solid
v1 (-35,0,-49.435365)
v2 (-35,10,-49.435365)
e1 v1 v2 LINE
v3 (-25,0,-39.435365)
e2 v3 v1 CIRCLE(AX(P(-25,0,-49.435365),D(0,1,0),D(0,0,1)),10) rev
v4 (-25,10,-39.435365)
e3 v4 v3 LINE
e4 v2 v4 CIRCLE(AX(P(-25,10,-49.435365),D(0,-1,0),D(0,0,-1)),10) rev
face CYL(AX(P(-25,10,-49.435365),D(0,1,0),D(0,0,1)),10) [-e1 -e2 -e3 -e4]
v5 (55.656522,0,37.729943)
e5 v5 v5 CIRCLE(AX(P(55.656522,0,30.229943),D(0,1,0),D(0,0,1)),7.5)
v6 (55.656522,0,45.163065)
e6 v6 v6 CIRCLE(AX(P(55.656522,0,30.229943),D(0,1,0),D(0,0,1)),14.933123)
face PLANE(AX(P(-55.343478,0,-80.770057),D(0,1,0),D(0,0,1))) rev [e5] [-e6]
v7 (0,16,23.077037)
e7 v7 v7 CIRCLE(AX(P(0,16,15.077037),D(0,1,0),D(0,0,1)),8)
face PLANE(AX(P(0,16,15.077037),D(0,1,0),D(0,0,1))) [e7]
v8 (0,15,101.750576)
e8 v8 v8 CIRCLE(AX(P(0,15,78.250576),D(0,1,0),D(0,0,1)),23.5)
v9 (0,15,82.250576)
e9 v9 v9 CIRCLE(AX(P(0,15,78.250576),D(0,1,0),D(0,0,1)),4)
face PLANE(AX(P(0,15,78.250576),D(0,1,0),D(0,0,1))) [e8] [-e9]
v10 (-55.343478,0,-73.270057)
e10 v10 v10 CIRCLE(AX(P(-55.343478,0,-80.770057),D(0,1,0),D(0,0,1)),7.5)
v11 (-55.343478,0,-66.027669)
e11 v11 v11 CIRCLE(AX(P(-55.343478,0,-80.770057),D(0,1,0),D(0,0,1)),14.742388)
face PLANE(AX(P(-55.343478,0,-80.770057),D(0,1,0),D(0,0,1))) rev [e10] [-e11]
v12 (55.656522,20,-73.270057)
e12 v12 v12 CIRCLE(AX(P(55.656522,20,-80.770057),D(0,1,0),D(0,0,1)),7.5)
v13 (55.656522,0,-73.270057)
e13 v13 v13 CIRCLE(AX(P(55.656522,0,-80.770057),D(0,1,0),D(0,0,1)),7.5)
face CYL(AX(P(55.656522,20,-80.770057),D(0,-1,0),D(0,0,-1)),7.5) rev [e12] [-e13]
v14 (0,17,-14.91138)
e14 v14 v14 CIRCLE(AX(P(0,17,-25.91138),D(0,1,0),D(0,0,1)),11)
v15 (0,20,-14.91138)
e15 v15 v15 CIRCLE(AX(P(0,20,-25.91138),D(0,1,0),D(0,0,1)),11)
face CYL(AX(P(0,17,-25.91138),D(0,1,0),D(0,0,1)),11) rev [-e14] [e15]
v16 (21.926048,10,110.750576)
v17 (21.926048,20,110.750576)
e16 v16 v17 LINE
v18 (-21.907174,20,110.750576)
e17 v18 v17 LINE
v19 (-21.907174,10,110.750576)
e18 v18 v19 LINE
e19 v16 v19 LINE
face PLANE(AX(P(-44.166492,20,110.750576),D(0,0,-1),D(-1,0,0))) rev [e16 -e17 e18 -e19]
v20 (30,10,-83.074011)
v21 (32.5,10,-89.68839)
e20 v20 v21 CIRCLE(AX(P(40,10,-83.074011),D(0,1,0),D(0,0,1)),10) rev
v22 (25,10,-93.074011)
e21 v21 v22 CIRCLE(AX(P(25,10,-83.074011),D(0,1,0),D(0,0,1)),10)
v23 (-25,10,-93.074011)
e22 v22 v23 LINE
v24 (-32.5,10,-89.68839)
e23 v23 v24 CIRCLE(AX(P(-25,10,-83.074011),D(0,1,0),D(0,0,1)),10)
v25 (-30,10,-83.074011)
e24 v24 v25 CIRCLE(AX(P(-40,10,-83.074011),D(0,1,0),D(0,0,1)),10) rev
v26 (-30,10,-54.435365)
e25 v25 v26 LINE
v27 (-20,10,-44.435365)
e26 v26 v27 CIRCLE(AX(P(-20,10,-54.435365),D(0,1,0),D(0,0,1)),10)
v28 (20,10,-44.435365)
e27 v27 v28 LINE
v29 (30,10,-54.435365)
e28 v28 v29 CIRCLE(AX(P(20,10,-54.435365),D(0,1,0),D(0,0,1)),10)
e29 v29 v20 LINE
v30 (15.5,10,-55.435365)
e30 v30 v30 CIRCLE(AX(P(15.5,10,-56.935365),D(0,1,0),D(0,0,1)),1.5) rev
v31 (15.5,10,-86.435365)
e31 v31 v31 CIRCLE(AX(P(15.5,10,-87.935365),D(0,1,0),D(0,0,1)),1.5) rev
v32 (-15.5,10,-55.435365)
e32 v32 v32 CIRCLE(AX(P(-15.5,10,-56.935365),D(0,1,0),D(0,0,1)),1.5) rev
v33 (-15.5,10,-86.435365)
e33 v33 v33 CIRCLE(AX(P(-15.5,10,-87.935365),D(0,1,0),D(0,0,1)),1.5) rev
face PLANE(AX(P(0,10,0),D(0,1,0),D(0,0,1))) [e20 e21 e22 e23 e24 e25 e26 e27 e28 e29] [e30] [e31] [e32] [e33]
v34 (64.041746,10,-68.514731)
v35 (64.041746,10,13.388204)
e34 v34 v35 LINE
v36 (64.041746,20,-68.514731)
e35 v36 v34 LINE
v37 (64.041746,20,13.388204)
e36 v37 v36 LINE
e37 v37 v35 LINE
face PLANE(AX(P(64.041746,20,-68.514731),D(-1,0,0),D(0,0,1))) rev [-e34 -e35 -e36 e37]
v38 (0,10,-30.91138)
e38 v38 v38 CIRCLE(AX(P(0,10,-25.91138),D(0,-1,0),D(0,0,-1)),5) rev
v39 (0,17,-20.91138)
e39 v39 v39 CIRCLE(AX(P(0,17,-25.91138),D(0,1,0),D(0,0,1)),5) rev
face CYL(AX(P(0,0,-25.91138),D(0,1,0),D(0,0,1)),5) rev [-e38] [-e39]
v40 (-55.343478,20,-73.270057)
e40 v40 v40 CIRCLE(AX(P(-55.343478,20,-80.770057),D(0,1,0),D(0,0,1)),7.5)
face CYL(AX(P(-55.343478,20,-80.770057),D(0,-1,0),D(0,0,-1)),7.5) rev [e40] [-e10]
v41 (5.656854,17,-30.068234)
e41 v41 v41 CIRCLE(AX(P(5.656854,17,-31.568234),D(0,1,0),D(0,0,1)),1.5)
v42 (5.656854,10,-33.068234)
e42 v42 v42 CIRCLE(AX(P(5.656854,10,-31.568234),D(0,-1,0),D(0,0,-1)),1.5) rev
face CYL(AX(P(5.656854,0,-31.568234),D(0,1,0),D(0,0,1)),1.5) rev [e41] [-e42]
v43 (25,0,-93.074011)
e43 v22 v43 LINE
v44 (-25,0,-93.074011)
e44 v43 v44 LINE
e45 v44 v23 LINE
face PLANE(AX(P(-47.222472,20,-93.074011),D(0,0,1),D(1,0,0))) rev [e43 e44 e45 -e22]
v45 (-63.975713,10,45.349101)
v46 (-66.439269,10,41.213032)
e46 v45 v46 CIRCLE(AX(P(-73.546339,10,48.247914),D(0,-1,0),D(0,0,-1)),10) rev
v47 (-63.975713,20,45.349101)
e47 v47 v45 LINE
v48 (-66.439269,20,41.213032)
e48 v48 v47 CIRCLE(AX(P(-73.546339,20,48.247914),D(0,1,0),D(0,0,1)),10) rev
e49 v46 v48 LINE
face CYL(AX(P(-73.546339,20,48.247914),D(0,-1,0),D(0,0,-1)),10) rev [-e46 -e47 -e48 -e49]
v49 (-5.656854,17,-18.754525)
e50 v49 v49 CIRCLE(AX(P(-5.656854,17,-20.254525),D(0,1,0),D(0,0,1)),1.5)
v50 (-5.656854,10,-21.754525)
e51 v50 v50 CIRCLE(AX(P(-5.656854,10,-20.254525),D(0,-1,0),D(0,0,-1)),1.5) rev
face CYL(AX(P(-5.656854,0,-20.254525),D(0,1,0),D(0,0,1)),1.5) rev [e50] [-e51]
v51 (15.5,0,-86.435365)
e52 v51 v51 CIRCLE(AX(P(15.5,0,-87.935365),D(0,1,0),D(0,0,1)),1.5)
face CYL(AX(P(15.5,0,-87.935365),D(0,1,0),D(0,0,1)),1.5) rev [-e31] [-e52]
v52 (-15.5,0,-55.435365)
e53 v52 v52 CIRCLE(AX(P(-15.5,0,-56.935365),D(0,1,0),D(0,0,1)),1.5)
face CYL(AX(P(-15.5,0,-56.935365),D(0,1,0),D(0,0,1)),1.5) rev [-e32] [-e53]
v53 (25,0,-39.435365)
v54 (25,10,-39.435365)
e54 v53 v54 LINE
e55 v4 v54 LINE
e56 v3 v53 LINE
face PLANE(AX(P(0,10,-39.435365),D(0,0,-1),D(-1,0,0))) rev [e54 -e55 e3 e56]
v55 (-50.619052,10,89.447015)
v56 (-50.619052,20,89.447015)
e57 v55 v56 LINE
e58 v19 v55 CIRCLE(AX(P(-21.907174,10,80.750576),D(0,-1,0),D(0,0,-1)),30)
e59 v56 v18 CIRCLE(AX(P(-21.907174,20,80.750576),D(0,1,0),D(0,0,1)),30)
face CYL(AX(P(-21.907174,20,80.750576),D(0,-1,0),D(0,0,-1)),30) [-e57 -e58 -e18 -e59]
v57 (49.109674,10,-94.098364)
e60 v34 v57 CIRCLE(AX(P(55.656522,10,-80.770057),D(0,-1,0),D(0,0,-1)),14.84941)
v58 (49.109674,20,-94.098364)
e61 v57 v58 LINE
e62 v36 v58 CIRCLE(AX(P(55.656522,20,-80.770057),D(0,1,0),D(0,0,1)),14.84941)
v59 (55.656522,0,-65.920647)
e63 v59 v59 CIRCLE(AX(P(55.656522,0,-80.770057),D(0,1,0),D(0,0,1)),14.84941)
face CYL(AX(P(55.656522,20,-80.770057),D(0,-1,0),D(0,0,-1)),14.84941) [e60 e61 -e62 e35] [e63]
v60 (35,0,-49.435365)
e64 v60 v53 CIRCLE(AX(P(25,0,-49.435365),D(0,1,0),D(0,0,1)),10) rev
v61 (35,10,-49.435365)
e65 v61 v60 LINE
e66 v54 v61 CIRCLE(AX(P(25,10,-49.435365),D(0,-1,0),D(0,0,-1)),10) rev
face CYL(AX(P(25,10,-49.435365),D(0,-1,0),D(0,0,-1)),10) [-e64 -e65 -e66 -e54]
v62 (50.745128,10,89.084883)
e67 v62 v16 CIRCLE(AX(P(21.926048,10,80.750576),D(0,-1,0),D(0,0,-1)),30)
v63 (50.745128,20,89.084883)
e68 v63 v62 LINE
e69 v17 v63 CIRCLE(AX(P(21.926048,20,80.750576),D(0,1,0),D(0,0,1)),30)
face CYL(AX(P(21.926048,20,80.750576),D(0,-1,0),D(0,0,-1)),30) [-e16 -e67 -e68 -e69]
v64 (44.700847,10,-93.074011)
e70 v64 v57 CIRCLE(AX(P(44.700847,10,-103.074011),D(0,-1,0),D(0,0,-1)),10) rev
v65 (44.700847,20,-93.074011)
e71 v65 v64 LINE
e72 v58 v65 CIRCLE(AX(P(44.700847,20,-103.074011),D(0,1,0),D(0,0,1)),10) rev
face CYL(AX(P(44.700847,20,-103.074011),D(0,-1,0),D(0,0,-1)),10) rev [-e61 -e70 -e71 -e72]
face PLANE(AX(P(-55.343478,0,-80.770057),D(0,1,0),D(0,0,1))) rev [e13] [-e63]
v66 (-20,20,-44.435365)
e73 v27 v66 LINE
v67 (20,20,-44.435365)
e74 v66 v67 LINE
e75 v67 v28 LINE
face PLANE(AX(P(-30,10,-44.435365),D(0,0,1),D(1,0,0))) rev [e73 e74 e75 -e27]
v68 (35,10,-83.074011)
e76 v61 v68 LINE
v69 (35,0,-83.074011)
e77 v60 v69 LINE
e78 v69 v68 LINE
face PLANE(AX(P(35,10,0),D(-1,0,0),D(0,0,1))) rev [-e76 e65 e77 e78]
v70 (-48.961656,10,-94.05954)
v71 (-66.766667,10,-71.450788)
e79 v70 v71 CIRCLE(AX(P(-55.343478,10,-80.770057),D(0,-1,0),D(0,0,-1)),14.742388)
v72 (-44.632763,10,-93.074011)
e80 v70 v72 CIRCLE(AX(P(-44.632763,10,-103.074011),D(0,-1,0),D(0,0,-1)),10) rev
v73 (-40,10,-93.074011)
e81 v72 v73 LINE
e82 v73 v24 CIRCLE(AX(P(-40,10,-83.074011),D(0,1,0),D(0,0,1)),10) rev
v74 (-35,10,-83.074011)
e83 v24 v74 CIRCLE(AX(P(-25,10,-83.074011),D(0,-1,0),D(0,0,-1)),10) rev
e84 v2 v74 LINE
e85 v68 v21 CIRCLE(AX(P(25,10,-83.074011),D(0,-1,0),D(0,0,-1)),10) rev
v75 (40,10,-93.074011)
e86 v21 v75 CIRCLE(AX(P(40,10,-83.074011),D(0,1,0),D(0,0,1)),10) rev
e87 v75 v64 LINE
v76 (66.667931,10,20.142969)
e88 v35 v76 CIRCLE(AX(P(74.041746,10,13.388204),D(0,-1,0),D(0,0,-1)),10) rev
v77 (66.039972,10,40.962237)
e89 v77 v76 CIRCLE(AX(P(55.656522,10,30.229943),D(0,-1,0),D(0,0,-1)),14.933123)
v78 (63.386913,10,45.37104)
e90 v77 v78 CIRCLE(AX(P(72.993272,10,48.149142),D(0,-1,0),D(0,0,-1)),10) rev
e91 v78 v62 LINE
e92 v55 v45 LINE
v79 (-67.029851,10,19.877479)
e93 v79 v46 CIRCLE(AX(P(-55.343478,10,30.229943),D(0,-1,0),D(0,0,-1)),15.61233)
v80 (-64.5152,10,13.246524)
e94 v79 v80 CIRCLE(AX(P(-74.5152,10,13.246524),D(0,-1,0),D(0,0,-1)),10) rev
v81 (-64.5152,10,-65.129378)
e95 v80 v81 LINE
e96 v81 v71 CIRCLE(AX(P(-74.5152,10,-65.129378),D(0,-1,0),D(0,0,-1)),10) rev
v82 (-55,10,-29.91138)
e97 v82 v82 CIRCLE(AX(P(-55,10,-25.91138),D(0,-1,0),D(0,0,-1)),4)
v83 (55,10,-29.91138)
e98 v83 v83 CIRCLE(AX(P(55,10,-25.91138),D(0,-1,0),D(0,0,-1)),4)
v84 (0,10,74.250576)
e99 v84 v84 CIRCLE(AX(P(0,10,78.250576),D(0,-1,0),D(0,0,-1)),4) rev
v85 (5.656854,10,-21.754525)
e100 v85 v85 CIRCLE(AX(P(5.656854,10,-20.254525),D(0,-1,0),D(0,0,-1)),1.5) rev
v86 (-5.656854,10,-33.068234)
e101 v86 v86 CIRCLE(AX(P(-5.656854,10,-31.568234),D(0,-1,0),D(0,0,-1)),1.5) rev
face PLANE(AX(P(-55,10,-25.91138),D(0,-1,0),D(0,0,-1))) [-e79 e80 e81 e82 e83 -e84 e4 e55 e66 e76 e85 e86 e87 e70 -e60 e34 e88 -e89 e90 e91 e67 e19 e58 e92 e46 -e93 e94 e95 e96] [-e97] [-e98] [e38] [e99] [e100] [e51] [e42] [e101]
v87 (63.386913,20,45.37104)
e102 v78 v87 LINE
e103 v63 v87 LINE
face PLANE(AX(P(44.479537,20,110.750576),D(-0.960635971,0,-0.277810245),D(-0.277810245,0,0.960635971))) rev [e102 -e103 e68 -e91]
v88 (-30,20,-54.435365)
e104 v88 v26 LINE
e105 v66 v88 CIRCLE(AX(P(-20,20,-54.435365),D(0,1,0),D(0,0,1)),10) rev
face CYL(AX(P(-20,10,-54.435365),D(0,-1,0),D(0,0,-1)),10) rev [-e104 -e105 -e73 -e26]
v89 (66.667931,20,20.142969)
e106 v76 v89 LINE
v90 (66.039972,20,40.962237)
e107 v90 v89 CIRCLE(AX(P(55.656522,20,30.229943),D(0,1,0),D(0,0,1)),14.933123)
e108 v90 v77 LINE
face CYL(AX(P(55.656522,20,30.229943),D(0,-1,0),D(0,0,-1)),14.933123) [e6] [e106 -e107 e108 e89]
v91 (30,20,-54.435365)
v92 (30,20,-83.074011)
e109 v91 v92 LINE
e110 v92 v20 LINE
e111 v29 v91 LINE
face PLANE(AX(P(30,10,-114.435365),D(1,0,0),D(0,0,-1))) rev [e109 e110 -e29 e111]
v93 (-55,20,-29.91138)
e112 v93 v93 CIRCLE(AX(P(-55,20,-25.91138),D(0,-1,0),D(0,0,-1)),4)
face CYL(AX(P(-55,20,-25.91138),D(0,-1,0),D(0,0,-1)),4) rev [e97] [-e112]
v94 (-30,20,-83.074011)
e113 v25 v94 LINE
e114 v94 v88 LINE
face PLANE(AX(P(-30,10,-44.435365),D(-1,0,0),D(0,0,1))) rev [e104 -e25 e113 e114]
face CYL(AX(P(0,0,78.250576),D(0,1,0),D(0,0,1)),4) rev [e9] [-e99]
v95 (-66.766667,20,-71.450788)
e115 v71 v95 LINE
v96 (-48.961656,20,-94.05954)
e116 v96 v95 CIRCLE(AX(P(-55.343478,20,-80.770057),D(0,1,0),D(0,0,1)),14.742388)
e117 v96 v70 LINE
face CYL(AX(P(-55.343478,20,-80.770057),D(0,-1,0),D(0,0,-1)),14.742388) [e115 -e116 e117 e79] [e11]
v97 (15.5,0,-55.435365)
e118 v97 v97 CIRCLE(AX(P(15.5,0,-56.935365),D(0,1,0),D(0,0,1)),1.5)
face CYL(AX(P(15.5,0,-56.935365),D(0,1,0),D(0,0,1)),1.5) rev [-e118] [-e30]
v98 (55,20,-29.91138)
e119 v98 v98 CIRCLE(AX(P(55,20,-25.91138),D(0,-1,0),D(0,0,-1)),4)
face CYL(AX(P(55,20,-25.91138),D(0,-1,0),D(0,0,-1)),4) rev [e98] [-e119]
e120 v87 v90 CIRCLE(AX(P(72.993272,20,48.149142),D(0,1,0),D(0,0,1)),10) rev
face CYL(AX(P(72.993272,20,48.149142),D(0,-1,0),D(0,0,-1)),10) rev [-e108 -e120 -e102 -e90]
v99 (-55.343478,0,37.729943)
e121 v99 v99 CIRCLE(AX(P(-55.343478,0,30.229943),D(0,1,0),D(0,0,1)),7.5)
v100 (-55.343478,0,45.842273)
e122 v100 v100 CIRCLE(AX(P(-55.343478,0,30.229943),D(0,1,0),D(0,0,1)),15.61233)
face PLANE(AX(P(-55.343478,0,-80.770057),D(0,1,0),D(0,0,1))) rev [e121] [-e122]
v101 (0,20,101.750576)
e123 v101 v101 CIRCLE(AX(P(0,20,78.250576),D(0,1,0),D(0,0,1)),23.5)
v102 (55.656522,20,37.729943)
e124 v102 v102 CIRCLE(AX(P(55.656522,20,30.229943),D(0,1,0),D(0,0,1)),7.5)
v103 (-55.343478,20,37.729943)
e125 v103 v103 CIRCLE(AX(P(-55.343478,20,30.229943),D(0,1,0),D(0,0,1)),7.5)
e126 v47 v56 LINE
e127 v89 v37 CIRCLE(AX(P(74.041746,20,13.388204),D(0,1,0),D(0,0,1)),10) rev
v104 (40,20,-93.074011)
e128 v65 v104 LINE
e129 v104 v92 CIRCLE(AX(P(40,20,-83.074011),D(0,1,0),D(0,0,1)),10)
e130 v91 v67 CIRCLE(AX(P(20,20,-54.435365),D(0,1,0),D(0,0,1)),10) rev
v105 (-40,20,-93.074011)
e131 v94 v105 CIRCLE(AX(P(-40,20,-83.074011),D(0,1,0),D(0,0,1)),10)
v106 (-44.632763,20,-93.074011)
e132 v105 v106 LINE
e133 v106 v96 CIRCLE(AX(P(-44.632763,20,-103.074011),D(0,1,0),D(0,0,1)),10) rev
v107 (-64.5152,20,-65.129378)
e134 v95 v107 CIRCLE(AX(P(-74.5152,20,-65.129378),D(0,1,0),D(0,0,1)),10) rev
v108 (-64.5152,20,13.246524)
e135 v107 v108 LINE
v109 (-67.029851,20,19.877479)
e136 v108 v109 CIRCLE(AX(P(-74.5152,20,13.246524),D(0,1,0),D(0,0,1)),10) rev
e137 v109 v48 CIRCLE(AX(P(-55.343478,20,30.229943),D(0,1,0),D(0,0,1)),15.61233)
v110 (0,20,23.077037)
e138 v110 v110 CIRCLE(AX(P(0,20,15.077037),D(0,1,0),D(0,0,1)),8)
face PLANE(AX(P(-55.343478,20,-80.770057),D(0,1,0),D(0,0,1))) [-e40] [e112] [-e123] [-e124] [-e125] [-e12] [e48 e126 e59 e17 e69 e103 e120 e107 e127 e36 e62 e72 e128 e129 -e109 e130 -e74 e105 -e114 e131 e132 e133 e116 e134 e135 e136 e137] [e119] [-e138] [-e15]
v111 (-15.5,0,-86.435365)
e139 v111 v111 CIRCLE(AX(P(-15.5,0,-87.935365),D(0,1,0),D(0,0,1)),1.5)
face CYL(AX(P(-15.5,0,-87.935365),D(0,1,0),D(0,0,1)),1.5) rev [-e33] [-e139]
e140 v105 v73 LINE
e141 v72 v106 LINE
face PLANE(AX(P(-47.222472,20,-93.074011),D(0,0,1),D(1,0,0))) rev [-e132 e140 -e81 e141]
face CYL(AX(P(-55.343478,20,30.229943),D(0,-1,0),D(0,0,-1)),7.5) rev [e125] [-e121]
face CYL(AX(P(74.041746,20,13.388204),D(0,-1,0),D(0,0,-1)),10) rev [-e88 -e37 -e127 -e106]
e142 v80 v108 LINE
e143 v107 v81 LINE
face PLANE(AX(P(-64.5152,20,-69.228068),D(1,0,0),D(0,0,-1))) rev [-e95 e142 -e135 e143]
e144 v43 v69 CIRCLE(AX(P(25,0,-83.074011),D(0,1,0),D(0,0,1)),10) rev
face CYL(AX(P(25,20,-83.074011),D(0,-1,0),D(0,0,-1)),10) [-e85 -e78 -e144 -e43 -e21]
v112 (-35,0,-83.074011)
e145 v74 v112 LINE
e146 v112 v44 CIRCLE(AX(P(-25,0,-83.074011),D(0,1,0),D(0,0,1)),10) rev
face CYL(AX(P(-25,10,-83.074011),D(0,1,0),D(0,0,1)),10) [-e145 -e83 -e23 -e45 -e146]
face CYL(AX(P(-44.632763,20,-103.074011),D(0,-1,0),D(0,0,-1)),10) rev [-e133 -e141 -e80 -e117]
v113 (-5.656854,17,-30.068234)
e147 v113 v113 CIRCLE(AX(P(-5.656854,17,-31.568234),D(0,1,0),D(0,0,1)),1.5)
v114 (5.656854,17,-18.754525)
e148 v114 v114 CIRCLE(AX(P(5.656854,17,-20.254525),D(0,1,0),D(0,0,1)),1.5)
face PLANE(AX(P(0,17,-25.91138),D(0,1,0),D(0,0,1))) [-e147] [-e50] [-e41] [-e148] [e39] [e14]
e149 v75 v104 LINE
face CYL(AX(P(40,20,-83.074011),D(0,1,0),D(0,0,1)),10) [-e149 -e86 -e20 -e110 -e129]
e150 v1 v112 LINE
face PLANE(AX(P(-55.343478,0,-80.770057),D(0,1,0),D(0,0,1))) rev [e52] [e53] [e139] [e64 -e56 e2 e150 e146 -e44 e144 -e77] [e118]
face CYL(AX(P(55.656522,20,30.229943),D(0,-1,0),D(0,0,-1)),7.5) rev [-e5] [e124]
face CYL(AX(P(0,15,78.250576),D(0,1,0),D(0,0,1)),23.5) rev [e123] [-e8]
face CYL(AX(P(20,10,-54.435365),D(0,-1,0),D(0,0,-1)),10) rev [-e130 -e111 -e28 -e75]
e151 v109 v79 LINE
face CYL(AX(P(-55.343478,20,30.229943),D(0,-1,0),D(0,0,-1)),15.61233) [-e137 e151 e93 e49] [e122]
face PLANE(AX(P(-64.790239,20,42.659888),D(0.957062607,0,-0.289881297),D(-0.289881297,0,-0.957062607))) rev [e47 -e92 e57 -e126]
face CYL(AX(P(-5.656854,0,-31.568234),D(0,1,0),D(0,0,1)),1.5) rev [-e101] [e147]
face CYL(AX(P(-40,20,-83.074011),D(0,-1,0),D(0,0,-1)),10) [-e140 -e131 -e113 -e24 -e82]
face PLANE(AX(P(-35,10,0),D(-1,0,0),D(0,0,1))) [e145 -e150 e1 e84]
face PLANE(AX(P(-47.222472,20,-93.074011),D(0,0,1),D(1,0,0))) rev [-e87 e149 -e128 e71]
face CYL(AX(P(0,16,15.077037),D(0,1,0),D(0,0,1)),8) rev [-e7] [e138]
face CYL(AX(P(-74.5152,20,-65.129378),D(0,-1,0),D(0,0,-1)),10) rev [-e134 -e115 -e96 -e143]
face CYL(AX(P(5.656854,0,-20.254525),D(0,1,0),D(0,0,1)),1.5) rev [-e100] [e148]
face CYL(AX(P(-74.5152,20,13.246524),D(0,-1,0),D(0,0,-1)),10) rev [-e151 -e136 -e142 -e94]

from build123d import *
from build123d.topology import SkipClean

# Parameters (mm, degrees)
SKETCH1_R           = 7.5
BOSS_EXTRUDE1_DEPTH = 20
SKETCH2_R           = 1.5
CUT_EXTRUDE1_DEPTH  = 20
SKETCH4_R           = 5
CUT_EXTRUDE2_DEPTH  = 20
SKETCH5_R           = 11
CUT_EXTRUDE3_DEPTH  = 3
SKETCH6_R           = 1.5
CUT_EXTRUDE4_DEPTH  = 133.625098353
SKETCH7_R           = 8
CUT_EXTRUDE5_DEPTH  = 4
FILLET3_R           = 30
FILLET4_R           = 10
SKETCH9_R           = 23.5
CUT_EXTRUDE6_DEPTH  = 5
SKETCH10_R          = 4
CUT_EXTRUDE7_DEPTH  = 133.383596843
SKETCH11_W          = 60
SKETCH11_H          = 70
CUT_EXTRUDE8_DEPTH  = 10
FILLET5_R           = 10
SKETCH12_R          = 12
CUT_EXTRUDE9_DEPTH  = 10
FILLET6_R           = 10
SKETCH13_R          = 4
CUT_EXTRUDE10_DEPTH = 132.910639121
SKETCH14_R          = 1.5
SKETCH14_R_2        = 5
SKETCH14_R_3        = 4
CUT_EXTRUDE11_DEPTH = 10
FILLET8_R           = 10
FILLET9_R           = 10


with BuildPart() as part:
    # Sketch1 → Boss-Extrude1 (new body)
    with BuildSketch(Plane(origin=(0, 0, 0), x_dir=(1, 0, 0), z_dir=(0, 1, 0))):
        with BuildLine():
            Line((-47.222472379, 93.074011467), (47.342817227, 93.074011467))
            ThreePointArc((47.342817227, 93.074011467), (67.936214726, 89.11955675), (64.041745588, 68.514731035))
            Line((64.041745588, 68.514731035), (64.041745588, -17.873317711))
            ThreePointArc((64.041745588, -17.873317711), (70.589208872, -30.115804346), (64.22965137, -42.456946225))
            Line((64.22965137, -42.456946225), (44.479537272, -110.750576059))
            Line((44.479537272, -110.750576059), (-44.166492384, -110.750576059))
            Line((-44.166492384, -110.750576059), (-64.790239223, -42.659888117))
            ThreePointArc((-64.790239223, -42.659888117), (-70.954867588, -30.058632987), (-64.515200042, -17.595689691))
            Line((-64.515200042, -17.595689691), (-64.515200042, 69.228067604))
            ThreePointArc((-64.515200042, 69.228067604), (-67.278018242, 89.424810491), (-47.222472379, 93.074011467))
        make_face()
        with Locations(Location((-55.343477556, 80.770057168, 0), (0, 0, 270))):
            Circle(SKETCH1_R, mode=Mode.SUBTRACT)
        with Locations(Location((55.656522444, 80.770057168, 0), (0, 0, 270))):
            Circle(SKETCH1_R, mode=Mode.SUBTRACT)
        with Locations(Location((-55.343477556, -30.229942832, 0), (0, 0, 270))):
            Circle(SKETCH1_R, mode=Mode.SUBTRACT)
        with Locations(Location((55.656522444, -30.229942832, 0), (0, 0, 270))):
            Circle(SKETCH1_R, mode=Mode.SUBTRACT)
    extrude(amount=BOSS_EXTRUDE1_DEPTH)

    # Sketch2 → Cut-Extrude1 (cut)
    with BuildSketch(Plane(origin=(0, 20, 0), x_dir=(1, 0, 0), z_dir=(0, 1, 0))):
        with Locations(Location((-15.5, 87.935365278, 0), (0, 0, 270))):
            Circle(SKETCH2_R)
        with Locations(Location((15.5, 87.935365278, 0), (0, 0, 270))):
            Circle(SKETCH2_R)
        with Locations(Location((-15.5, 56.935365278, 0), (0, 0, 270))):
            Circle(SKETCH2_R)
        with Locations(Location((15.5, 56.935365278, 0), (0, 0, 270))):
            Circle(SKETCH2_R)
    extrude(amount=-CUT_EXTRUDE1_DEPTH, mode=Mode.SUBTRACT)

    # Sketch4 → Cut-Extrude2 (cut)
    with BuildSketch(Plane(origin=(0, 20, 0), x_dir=(1, 0, 0), z_dir=(0, 1, 0))):
        with Locations(Location((0, 25.91137957, 0), (0, 0, 270))):
            Circle(SKETCH4_R)
    extrude(amount=-CUT_EXTRUDE2_DEPTH, mode=Mode.SUBTRACT)

    # Sketch5 → Cut-Extrude3 (cut)
    with BuildSketch(Plane(origin=(0, 20, 0), x_dir=(1, 0, 0), z_dir=(0, 1, 0))):
        with Locations(Location((0, 25.91137957, 0), (0, 0, 270))):
            Circle(SKETCH5_R)
    extrude(amount=-CUT_EXTRUDE3_DEPTH, mode=Mode.SUBTRACT)

    # Sketch6 → Cut-Extrude4 (cut, through all)
    with BuildSketch(Plane(origin=(0, 17, 0), x_dir=(1, 0, 0), z_dir=(0, 1, 0))):
        with Locations(Location((-5.656854249, 31.568233819, 0), (0, 0, 270))):
            Circle(SKETCH6_R)
        with Locations(Location((5.656854249, 31.568233819, 0), (0, 0, 270))):
            Circle(SKETCH6_R)
        with Locations(Location((5.656854249, 20.25452532, 0), (0, 0, 270))):
            Circle(SKETCH6_R)
        with Locations(Location((-5.656854249, 20.25452532, 0), (0, 0, 270))):
            Circle(SKETCH6_R)
    extrude(amount=-CUT_EXTRUDE4_DEPTH, mode=Mode.SUBTRACT)

    # Sketch7 → Cut-Extrude5 (cut)
    with BuildSketch(Plane(origin=(0, 20, 0), x_dir=(1, 0, 0), z_dir=(0, 1, 0))):
        with Locations(Location((0, -15.077036946, 0), (0, 0, 270))):
            Circle(SKETCH7_R)
    extrude(amount=-CUT_EXTRUDE5_DEPTH, mode=Mode.SUBTRACT)

    # Fillet3
    fillet3_edges = [part.edges().sort_by_distance(p)[0] for p in [
        (44.479537272, 10, 110.750576059),
        (-44.166492384, 10, 110.750576059),
    ]]
    fillet(fillet3_edges, radius=FILLET3_R)

    # Fillet4
    fillet4_edges = [part.edges().sort_by_distance(p)[0] for p in [
        (64.22965137, 10, 42.456946225),
        (-64.790239223, 10, 42.659888117),
    ]]
    fillet(fillet4_edges, radius=FILLET4_R)

    # Sketch9 → Cut-Extrude6 (cut)
    with BuildSketch(Plane(origin=(0, 20, 0), x_dir=(1, 0, 0), z_dir=(0, 1, 0))):
        with Locations(Location((0, -78.250576059, 0), (0, 0, 270))):
            Circle(SKETCH9_R)
    extrude(amount=-CUT_EXTRUDE6_DEPTH, mode=Mode.SUBTRACT)

    # Sketch10 → Cut-Extrude7 (cut, through all)
    with BuildSketch(Plane(origin=(0, 15, 0), x_dir=(1, 0, 0), z_dir=(0, 1, 0))):
        with Locations(Location((0, -78.250576059, 0), (0, 0, 270))):
            Circle(SKETCH10_R)
    extrude(amount=-CUT_EXTRUDE7_DEPTH, mode=Mode.SUBTRACT)

    # Sketch11 → Cut-Extrude8 (cut)
    with BuildSketch(Plane(origin=(0, 20, 0), x_dir=(1, 0, 0), z_dir=(0, 1, 0))):
        with Locations((0, 79.435365278)):
            Rectangle(SKETCH11_W, SKETCH11_H)
    extrude(amount=-CUT_EXTRUDE8_DEPTH, mode=Mode.SUBTRACT)

    # Fillet5
    fillet5_edges = [part.edges().sort_by_distance(p)[0] for p in [
        (-30, 15, -44.435365278),
        (30, 15, -44.435365278),
    ]]
    fillet(fillet5_edges, radius=FILLET5_R)

    # Sketch12 → Cut-Extrude9 (cut)
    with BuildSketch(Plane.XZ):
        with Locations((-55, -25.91137957)):
            Circle(SKETCH12_R)
        with Locations((55, -25.91137957)):
            Circle(SKETCH12_R)
    extrude(amount=-CUT_EXTRUDE9_DEPTH, mode=Mode.SUBTRACT)

    # Fillet6
    fillet6_edges = [part.edges().sort_by_distance(p)[0] for p in [
        (64.041745588, 5, -18.021713118),
        (64.041745588, 5, -33.801046022),
        (-64.515200042, 5, -33.22308034),
        (-64.515200042, 5, -18.5996788),
    ]]
    fillet(fillet6_edges, radius=FILLET6_R)

    # Sketch13 → Cut-Extrude10 (cut, through all)
    with BuildSketch(Plane.XZ.offset(-10)):
        with Locations(Location((-55, -25.91137957, 0), (0, 0, 270))):
            Circle(SKETCH13_R)
        with Locations(Location((55, -25.91137957, 0), (0, 0, 270))):
            Circle(SKETCH13_R)
    extrude(amount=-CUT_EXTRUDE10_DEPTH, mode=Mode.SUBTRACT)

    # Sketch14 → Cut-Extrude11 (cut)
    with SkipClean():  # the faces are left unmerged after this step: merging them gives an invalid solid
        with BuildSketch(Plane.XZ):
            with BuildLine():
                Line((-35, -93.074011467), (-35, -39.435365278))
                Line((-35, -39.435365278), (35, -39.435365278))
                Line((35, -39.435365278), (35, -93.074011467))
                Line((35, -93.074011467), (47.342817227, -93.074011467))
                ThreePointArc((47.342817227, -93.074011467), (43.376830162, -72.420557586), (64.041745588, -68.514731035))
                Line((64.041745588, -68.514731035), (64.041745588, -47.890500309))
                ThreePointArc((64.041745588, -47.890500309), (61.265169356, -40.975144276), (54.477315775, -37.899990882))
                ThreePointArc((54.477315775, -37.899990882), (43, -25.91137957), (54.477315775, -13.922768257))
                ThreePointArc((54.477315775, -13.922768257), (61.265169356, -10.847614863), (64.041745588, -3.93225883))
                Line((64.041745588, -3.93225883), (64.041745588, 17.873317711))
                ThreePointArc((64.041745588, 17.873317711), (40.77901218, 31.517514149), (66.039971727, 40.96223674))
                ThreePointArc((66.039971727, 40.96223674), (64.425018609, 42.993075226), (63.386912774, 45.371039651))
                Line((63.386912774, 45.371039651), (50.745127533, 89.084883404))
                ThreePointArc((50.745127533, 89.084883404), (39.953399576, 104.730038317), (21.926048417, 110.750576059))
                Line((21.926048417, 110.750576059), (-21.907174195, 110.750576059))
                ThreePointArc((-21.907174195, 110.750576059), (-39.783231267, 104.843035119), (-50.619052406, 89.447014961))
                Line((-50.619052406, 89.447014961), (-63.975713192, 45.349100617))
                ThreePointArc((-63.975713192, 45.349100617), (-64.954881243, 43.13060481), (-66.439269442, 41.213032024))
                ThreePointArc((-66.439269442, 41.213032024), (-39.782701565, 31.497655875), (-64.515200042, 17.595689691))
                Line((-64.515200042, 17.595689691), (-64.515200042, -3.916721832))
                ThreePointArc((-64.515200042, -3.916721832), (-61.663753608, -10.90944533), (-54.735563659, -13.914293531))
                ThreePointArc((-54.735563659, -13.914293531), (-43, -25.91137957), (-54.735563659, -37.908465609))
                ThreePointArc((-54.735563659, -37.908465609), (-61.663753608, -40.91331381), (-64.515200042, -47.906037308))
                Line((-64.515200042, -47.906037308), (-64.515200042, -69.228067604))
                ThreePointArc((-64.515200042, -69.228067604), (-43.40893687, -72.115303846), (-47.222472379, -93.074011467))
                Line((-47.222472379, -93.074011467), (-35, -93.074011467))
            make_face()
            with Locations(Location((-5.656854249, -31.568233819, 0), (0, 0, 90))):
                Circle(SKETCH14_R, mode=Mode.SUBTRACT)
            with Locations(Location((-5.656854249, -20.25452532, 0), (0, 0, 90))):
                Circle(SKETCH14_R, mode=Mode.SUBTRACT)
            with Locations(Location((5.656854249, -31.568233819, 0), (0, 0, 90))):
                Circle(SKETCH14_R, mode=Mode.SUBTRACT)
            with Locations(Location((0, -25.91137957, 0), (0, 0, 90))):
                Circle(SKETCH14_R_2, mode=Mode.SUBTRACT)
            with Locations(Location((5.656854249, -20.25452532, 0), (0, 0, 90))):
                Circle(SKETCH14_R, mode=Mode.SUBTRACT)
            with Locations(Location((0, 78.250576059, 0), (0, 0, 90))):
                Circle(SKETCH14_R_3, mode=Mode.SUBTRACT)
        extrude(amount=-CUT_EXTRUDE11_DEPTH, mode=Mode.SUBTRACT)

    # Fillet8
    # the kernel refuses this fillet: 10 mm, written as the material it adds along each edge
    with BuildSketch(Plane(origin=(-47.222472379, 10, -93.074011467), x_dir=(-0.8700239492494848, 0, -0.4930094600840129), z_dir=(0, 1, 0))) as fillet8_piece_1:
        with BuildLine():
            CenterArc((2.676985366, -9.976990745), FILLET8_R, 93.887516216, 25.651061108)
            Line((-2.253109235, -1.276751253), (0, 0))
            ThreePointArc((0, 0), (0.999503131, -0.033921137), (1.999006261, 0))
        make_face()
    extrude(amount=10)
    with BuildSketch(Plane(origin=(47.342817227, 10, -93.074011467), x_dir=(-1, 0, 0), z_dir=(0, 1, 0))) as fillet8_piece_2:
        with BuildLine():
            CenterArc((2.641969758, -10), FILLET8_R, 90, 26.160214117)
            ThreePointArc((-1.766857191, -1.024352674), (-0.865797103, -0.542588059), (0, 0))
            Line((0, 0), (2.641969758, 0))
        make_face()
    extrude(amount=10)
    with BuildSketch(Plane(origin=(64.041745588, 10, 17.873317711), x_dir=(0, 0, -1), z_dir=(0, 1, 0))) as fillet8_piece_3:
        with BuildLine():
            CenterArc((4.485113927, -10), FILLET8_R, 90, 42.491166092)
            ThreePointArc((-2.269651329, -2.626185089), (-1.058262626, -1.379261301), (0, 0))
            Line((0, 0), (4.485113927, 0))
        make_face()
    extrude(amount=10)
    with BuildSketch(Plane(origin=(-64.515200042, 10, 17.595689691), x_dir=(-0.7405638578524667, 0, 0.6719859912547816), z_dir=(0, 1, 0))) as fillet8_piece_4:
        with BuildLine():
            CenterArc((4.483060436, -9.940694531), FILLET8_R, 96.243093942, 41.536375837)
            Line((-2.922578142, -3.220834618), (0, 0))
            ThreePointArc((0, 0), (1.697794933, -0.092589655), (3.395589866, 0))
        make_face()
    extrude(amount=10)
    with BuildSketch(Plane(origin=(-64.515200042, 10, -69.228067604), x_dir=(0, 0, 1), z_dir=(0, 1, 0))) as fillet8_piece_5:
        with BuildLine():
            CenterArc((4.098689509, -10), FILLET8_R, 90, 39.20826159)
            ThreePointArc((-2.22272086, -2.251466529), (-1.050788512, -1.185531829), (0, 0))
            Line((0, 0), (4.098689509, 0))
        make_face()
    extrude(amount=10)
    # the kernel refuses this fillet: 10 mm, written as the material it takes off along each edge
    with BuildSketch(Plane(origin=(-30, 10, -93.074011467), x_dir=(0, 0, 1), z_dir=(0, 1, 0)), Plane(origin=(35, -25, -39.435365278), x_dir=(-1, 0, 0), z_dir=(0, 1, 0)), Plane(origin=(-35, -25, -39.435365278), x_dir=(0, 0, -1), z_dir=(0, 1, 0))) as fillet8_2_piece_1:
        with BuildLine():
            CenterArc((FILLET8_R, -FILLET8_R), FILLET8_R, 90, 90)
            Line((0, -FILLET8_R), (0, 0))
            Line((0, 0), (FILLET8_R, 0))
        make_face()
    extrude(amount=35, mode=Mode.SUBTRACT)
    with BuildSketch(Plane(origin=(30, 45, -93.074011467), x_dir=(1, 0, 0), z_dir=(0, -1, 0))) as fillet8_2_piece_2:
        with BuildLine():
            CenterArc((FILLET8_R, FILLET8_R), FILLET8_R, 180, 90)
            Line((0, FILLET8_R), (0, 0))
            Line((0, 0), (FILLET8_R, 0))
        make_face()
    extrude(amount=35, mode=Mode.SUBTRACT)

    # Fillet9
    # the kernel refuses this fillet: 10 mm, written as the material it takes off along each edge
    with BuildSketch(Plane(origin=(35, -25, -93.074011467), x_dir=(0, 0, 1), z_dir=(0, 1, 0))) as fillet9_piece_1:
        with BuildLine():
            CenterArc((FILLET9_R, -FILLET9_R), FILLET9_R, 90, 90)
            Line((0, -FILLET9_R), (0, 0))
            Line((0, 0), (FILLET9_R, 0))
        make_face()
    extrude(amount=35, mode=Mode.SUBTRACT)
    with BuildSketch(Plane(origin=(-35, -25, -93.074011467), x_dir=(0, 0, 1), z_dir=(0, 1, 0))) as fillet9_piece_2:
        with BuildLine():
            CenterArc((FILLET9_R, FILLET9_R), FILLET9_R, 180, 90)
            Line((0, FILLET9_R), (0, 0))
            Line((0, 0), (FILLET9_R, 0))
        make_face()
    extrude(amount=35, mode=Mode.SUBTRACT)


solid = part.part
